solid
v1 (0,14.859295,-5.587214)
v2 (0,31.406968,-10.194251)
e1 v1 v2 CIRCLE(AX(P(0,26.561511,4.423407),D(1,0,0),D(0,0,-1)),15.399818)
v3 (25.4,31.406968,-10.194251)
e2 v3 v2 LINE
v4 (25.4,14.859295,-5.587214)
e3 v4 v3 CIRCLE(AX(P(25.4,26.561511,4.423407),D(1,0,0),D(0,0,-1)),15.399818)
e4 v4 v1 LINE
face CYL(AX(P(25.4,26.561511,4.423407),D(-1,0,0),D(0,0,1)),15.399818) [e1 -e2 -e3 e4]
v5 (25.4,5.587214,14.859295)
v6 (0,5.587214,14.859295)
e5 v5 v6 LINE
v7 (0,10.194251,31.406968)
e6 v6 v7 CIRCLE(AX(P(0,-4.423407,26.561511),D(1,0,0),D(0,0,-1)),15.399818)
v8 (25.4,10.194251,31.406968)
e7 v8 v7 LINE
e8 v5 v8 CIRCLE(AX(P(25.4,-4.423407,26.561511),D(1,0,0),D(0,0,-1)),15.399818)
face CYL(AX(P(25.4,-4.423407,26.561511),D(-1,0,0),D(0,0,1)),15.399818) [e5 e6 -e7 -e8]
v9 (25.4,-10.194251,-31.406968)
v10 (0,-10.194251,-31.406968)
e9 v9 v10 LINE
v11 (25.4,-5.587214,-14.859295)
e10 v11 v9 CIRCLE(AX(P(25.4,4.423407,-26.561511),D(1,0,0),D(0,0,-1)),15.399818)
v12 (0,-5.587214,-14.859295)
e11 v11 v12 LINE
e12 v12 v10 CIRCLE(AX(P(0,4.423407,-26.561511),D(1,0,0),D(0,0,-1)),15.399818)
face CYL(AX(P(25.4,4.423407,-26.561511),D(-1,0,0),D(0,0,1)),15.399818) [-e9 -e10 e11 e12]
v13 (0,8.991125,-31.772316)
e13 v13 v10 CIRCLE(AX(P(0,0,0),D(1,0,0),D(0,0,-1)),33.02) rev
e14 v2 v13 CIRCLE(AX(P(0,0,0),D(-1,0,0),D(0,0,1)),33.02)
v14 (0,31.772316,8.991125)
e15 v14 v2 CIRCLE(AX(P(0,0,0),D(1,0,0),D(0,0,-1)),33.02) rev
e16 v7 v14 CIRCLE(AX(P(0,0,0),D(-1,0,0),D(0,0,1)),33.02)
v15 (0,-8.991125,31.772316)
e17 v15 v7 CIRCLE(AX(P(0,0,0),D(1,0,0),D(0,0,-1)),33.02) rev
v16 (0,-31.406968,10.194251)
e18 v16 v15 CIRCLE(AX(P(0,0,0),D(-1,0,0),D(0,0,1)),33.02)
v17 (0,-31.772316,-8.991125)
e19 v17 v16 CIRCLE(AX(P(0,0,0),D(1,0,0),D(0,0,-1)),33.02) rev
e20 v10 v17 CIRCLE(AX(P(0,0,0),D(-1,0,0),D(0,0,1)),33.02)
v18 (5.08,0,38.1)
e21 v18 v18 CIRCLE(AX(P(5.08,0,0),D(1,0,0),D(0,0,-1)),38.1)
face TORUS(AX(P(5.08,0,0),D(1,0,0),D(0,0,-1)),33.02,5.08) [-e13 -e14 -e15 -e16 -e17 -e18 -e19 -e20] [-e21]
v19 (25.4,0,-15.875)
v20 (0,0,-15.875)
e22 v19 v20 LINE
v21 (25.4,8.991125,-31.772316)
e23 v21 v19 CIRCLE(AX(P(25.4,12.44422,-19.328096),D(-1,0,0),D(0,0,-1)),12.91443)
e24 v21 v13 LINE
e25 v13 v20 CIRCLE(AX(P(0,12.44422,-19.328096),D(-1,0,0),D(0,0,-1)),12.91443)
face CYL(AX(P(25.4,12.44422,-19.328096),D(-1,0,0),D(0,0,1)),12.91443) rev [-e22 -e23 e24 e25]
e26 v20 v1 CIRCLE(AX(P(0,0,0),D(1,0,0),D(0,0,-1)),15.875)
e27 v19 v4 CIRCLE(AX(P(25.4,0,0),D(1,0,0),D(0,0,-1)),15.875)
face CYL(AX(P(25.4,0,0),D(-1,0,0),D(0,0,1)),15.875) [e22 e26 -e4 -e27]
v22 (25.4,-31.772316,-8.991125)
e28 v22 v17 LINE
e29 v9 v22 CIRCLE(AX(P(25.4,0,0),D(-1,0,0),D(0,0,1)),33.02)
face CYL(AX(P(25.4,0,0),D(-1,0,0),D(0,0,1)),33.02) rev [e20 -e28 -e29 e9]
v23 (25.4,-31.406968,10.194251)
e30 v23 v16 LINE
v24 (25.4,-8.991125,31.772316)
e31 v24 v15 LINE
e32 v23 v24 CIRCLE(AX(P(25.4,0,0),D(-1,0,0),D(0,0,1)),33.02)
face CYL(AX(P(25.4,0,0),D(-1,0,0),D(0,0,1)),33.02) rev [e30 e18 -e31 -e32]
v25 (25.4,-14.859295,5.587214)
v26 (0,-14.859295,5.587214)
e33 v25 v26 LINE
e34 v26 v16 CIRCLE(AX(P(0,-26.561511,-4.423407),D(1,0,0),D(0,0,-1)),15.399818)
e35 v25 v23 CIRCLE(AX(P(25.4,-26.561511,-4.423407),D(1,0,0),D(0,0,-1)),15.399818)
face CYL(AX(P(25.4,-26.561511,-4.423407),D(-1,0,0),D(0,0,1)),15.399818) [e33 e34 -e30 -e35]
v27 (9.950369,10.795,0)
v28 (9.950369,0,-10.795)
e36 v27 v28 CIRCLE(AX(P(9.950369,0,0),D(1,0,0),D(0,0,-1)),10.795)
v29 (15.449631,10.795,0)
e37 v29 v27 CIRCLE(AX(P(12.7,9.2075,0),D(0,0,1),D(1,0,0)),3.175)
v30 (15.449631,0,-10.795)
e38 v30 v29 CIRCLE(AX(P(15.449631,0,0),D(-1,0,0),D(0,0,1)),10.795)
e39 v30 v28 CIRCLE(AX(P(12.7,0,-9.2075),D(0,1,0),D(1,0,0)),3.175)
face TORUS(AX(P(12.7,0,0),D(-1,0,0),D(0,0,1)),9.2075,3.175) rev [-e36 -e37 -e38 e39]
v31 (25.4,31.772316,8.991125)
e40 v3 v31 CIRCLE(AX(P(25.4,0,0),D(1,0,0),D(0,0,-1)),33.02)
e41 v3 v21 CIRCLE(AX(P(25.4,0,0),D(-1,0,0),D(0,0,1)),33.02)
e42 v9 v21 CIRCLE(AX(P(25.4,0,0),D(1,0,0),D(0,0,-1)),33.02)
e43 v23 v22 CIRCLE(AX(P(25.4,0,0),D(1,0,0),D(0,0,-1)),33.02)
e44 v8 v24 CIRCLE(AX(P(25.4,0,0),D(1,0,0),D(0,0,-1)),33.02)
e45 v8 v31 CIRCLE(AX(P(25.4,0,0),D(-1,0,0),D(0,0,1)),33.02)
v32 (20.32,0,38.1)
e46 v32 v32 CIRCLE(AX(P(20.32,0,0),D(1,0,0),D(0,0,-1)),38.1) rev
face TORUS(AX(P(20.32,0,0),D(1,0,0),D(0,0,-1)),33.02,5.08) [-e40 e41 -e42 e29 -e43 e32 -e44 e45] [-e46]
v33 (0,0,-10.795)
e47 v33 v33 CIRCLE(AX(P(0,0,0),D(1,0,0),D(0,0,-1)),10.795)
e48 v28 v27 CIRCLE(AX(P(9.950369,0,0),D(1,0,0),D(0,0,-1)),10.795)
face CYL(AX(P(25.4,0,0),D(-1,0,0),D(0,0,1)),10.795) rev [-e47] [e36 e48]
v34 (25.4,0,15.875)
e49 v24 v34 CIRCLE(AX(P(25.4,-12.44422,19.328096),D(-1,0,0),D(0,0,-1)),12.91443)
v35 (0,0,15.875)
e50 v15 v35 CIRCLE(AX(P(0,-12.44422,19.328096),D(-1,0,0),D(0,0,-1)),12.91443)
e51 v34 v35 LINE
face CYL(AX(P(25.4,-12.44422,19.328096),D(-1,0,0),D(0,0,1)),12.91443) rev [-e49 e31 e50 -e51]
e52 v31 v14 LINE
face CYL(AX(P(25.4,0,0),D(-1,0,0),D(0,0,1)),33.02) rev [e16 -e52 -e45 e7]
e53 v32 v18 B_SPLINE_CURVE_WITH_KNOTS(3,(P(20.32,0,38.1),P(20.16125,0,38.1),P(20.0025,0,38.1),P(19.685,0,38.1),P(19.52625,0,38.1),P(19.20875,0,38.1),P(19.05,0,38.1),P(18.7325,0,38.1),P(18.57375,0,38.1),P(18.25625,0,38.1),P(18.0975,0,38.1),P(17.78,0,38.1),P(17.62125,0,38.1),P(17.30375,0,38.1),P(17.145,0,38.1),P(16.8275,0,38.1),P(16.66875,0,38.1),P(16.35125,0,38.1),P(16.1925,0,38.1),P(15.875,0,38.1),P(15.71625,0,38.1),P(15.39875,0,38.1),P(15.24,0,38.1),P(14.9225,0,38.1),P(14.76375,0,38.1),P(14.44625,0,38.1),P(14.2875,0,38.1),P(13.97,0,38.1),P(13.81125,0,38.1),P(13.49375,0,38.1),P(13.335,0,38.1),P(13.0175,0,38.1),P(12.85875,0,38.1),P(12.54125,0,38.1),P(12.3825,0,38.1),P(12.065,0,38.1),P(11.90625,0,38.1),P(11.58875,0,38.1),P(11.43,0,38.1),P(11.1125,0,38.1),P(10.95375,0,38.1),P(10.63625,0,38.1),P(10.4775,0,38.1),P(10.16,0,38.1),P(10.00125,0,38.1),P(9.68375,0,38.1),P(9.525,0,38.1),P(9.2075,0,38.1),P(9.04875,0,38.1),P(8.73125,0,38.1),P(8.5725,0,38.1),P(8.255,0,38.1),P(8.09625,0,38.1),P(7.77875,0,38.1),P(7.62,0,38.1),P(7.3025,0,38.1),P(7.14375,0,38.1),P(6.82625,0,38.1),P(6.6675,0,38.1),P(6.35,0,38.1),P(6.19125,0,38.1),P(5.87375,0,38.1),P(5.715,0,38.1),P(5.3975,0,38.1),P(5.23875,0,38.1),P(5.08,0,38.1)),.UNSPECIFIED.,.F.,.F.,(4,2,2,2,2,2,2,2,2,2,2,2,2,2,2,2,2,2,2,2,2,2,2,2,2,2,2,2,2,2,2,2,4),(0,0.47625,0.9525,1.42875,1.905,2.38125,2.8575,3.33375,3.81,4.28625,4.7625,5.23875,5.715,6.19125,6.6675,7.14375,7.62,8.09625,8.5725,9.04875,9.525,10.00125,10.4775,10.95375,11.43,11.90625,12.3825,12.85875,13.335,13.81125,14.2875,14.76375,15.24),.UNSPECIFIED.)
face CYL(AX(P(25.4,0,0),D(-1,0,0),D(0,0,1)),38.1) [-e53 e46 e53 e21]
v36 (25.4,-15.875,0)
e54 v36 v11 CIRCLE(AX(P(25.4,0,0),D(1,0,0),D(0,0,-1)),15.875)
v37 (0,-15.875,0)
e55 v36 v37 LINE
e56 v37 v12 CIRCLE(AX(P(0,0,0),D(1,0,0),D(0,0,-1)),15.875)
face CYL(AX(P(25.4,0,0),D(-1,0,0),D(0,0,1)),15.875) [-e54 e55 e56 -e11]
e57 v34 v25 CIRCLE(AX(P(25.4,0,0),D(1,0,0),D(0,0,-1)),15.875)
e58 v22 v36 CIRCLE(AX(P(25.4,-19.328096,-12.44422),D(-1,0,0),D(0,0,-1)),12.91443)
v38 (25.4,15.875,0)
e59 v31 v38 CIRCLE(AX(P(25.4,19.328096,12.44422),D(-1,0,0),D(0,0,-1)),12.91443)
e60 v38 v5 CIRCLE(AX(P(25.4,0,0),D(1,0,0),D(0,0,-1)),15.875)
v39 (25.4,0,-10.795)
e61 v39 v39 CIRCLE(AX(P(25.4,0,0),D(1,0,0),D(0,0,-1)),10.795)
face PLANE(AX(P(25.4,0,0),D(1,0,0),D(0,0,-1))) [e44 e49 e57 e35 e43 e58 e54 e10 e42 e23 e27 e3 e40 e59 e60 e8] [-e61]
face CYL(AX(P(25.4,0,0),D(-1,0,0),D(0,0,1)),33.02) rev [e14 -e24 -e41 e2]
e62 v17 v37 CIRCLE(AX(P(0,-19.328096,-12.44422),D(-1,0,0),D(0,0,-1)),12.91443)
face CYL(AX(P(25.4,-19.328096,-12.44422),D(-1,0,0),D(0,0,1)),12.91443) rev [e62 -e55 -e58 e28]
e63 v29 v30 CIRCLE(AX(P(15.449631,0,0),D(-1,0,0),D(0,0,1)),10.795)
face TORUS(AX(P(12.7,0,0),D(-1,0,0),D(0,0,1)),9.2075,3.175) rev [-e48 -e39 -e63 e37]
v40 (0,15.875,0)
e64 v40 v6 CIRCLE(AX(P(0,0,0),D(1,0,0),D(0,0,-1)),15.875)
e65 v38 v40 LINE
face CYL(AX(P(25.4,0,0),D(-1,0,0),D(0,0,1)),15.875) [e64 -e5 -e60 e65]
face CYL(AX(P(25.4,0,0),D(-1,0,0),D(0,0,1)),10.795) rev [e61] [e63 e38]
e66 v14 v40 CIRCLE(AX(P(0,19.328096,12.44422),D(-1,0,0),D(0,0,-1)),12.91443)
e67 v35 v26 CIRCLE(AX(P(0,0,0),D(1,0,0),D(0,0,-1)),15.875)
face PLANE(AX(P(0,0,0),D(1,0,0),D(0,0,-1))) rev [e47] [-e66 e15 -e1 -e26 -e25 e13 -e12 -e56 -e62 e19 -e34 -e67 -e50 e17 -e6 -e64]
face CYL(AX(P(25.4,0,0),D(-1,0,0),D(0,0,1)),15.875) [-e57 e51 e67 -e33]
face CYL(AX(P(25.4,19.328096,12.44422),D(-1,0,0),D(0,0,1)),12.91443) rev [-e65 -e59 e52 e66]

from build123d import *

# Parameters (mm, degrees)
SKETCH1_R           = 15.875
SKETCH1_R_2         = 10.795
BOSS_EXTRUDE1_DEPTH = 25.4
SKETCH2_R           = 38.1
BOSS_EXTRUDE2_DEPTH = 25.4
FILLET1_R           = 5.08


with BuildPart() as part:
    # Sketch1 → Boss-Extrude1 (new body)
    with BuildSketch(Plane(origin=(0, 0, 0), x_dir=(0, 0, -1), z_dir=(1, 0, 0))):
        with Locations(Location((0, 0, 0), (0, 0, 180))):
            Circle(SKETCH1_R)
        with Locations(Location((0, 0, 0), (0, 0, 180))):
            Circle(SKETCH1_R_2, mode=Mode.SUBTRACT)
    extrude(amount=BOSS_EXTRUDE1_DEPTH)

    # Sketch2 → Boss-Extrude2 (add)
    with BuildSketch(Plane.ZY):
        Circle(SKETCH2_R)
        with BuildLine():
            ThreePointArc((15.875, 0), (15.6190099, 2.839393375), (14.859295466, 5.587214267))
            ThreePointArc((14.859295466, 5.587214267), (22.431138125, 10.412171765), (31.406968253, 10.194250594))
            ThreePointArc((31.406968253, 10.194250594), (22.899884414, 23.788982615), (8.991124629, 31.772316219))
            ThreePointArc((8.991124629, 31.772316219), (1.203120323, 25.685780991), (0, 15.875))
            ThreePointArc((0, 15.875), (-2.839393375, 15.6190099), (-5.587214267, 14.859295466))
            ThreePointArc((-5.587214267, 14.859295466), (-10.412171765, 22.431138125), (-10.194250594, 31.406968253))
            ThreePointArc((-10.194250594, 31.406968253), (-23.788982615, 22.899884414), (-31.772316219, 8.991124629))
            ThreePointArc((-31.772316219, 8.991124629), (-25.685780991, 1.203120323), (-15.875, 0))
            ThreePointArc((-15.875, 0), (-15.6190099, -2.839393375), (-14.859295466, -5.587214267))
            ThreePointArc((-14.859295466, -5.587214267), (-22.431138125, -10.412171765), (-31.406968253, -10.194250594))
            ThreePointArc((-31.406968253, -10.194250594), (-22.899884414, -23.788982615), (-8.991124629, -31.772316219))
            ThreePointArc((-8.991124629, -31.772316219), (-1.203120323, -25.685780991), (0, -15.875))
            ThreePointArc((0, -15.875), (2.839393375, -15.6190099), (5.587214267, -14.859295466))
            ThreePointArc((5.587214267, -14.859295466), (10.412171765, -22.431138125), (10.194250594, -31.406968253))
            ThreePointArc((10.194250594, -31.406968253), (23.788982615, -22.899884414), (31.772316219, -8.991124629))
            ThreePointArc((31.772316219, -8.991124629), (25.685780991, -1.203120323), (15.875, 0))
        make_face(mode=Mode.SUBTRACT)
    extrude(amount=-BOSS_EXTRUDE2_DEPTH)

    # Cut-Sweep1: sweep along a curve in space
    with BuildLine() as cut_sweep1_path:
        ThreePointArc((25.4, 0, -10.795), (25.4, 7.633217703, -7.633217703), (25.4, 10.795, 0))
        ThreePointArc((25.4, 10.795, 0), (25.4, 7.633217703, 7.633217703), (25.4, 0, 10.795))
        ThreePointArc((25.4, 0, 10.795), (25.4, -7.633217703, 7.633217703), (25.4, -10.795, 0))
        ThreePointArc((25.4, -10.795, 0), (25.4, -7.633217703, -7.633217703), (25.4, 0, -10.795))
    # Sketch5 → Cut-Sweep1 (sweep, cut)
    with BuildSketch(Plane.XY):
        with BuildLine():
            Line((15.450320755, 10.793804114), (9.949679245, 10.793804114))
            ThreePointArc((9.949679245, 10.793804114), (12.7, 12.3825), (15.450320755, 10.793804114))
        make_face()
    sweep(path=cut_sweep1_path.line, mode=Mode.SUBTRACT)

    # Fillet1
    fillet1_edges = [part.edges().sort_by_distance(p)[0] for p in [
        (25.4, 0, -38.1),
        (0, 0, -38.1),
    ]]
    fillet(fillet1_edges, radius=FILLET1_R - 0.0001)  # a hair under: the kernel refuses the full size


solid = part.part
